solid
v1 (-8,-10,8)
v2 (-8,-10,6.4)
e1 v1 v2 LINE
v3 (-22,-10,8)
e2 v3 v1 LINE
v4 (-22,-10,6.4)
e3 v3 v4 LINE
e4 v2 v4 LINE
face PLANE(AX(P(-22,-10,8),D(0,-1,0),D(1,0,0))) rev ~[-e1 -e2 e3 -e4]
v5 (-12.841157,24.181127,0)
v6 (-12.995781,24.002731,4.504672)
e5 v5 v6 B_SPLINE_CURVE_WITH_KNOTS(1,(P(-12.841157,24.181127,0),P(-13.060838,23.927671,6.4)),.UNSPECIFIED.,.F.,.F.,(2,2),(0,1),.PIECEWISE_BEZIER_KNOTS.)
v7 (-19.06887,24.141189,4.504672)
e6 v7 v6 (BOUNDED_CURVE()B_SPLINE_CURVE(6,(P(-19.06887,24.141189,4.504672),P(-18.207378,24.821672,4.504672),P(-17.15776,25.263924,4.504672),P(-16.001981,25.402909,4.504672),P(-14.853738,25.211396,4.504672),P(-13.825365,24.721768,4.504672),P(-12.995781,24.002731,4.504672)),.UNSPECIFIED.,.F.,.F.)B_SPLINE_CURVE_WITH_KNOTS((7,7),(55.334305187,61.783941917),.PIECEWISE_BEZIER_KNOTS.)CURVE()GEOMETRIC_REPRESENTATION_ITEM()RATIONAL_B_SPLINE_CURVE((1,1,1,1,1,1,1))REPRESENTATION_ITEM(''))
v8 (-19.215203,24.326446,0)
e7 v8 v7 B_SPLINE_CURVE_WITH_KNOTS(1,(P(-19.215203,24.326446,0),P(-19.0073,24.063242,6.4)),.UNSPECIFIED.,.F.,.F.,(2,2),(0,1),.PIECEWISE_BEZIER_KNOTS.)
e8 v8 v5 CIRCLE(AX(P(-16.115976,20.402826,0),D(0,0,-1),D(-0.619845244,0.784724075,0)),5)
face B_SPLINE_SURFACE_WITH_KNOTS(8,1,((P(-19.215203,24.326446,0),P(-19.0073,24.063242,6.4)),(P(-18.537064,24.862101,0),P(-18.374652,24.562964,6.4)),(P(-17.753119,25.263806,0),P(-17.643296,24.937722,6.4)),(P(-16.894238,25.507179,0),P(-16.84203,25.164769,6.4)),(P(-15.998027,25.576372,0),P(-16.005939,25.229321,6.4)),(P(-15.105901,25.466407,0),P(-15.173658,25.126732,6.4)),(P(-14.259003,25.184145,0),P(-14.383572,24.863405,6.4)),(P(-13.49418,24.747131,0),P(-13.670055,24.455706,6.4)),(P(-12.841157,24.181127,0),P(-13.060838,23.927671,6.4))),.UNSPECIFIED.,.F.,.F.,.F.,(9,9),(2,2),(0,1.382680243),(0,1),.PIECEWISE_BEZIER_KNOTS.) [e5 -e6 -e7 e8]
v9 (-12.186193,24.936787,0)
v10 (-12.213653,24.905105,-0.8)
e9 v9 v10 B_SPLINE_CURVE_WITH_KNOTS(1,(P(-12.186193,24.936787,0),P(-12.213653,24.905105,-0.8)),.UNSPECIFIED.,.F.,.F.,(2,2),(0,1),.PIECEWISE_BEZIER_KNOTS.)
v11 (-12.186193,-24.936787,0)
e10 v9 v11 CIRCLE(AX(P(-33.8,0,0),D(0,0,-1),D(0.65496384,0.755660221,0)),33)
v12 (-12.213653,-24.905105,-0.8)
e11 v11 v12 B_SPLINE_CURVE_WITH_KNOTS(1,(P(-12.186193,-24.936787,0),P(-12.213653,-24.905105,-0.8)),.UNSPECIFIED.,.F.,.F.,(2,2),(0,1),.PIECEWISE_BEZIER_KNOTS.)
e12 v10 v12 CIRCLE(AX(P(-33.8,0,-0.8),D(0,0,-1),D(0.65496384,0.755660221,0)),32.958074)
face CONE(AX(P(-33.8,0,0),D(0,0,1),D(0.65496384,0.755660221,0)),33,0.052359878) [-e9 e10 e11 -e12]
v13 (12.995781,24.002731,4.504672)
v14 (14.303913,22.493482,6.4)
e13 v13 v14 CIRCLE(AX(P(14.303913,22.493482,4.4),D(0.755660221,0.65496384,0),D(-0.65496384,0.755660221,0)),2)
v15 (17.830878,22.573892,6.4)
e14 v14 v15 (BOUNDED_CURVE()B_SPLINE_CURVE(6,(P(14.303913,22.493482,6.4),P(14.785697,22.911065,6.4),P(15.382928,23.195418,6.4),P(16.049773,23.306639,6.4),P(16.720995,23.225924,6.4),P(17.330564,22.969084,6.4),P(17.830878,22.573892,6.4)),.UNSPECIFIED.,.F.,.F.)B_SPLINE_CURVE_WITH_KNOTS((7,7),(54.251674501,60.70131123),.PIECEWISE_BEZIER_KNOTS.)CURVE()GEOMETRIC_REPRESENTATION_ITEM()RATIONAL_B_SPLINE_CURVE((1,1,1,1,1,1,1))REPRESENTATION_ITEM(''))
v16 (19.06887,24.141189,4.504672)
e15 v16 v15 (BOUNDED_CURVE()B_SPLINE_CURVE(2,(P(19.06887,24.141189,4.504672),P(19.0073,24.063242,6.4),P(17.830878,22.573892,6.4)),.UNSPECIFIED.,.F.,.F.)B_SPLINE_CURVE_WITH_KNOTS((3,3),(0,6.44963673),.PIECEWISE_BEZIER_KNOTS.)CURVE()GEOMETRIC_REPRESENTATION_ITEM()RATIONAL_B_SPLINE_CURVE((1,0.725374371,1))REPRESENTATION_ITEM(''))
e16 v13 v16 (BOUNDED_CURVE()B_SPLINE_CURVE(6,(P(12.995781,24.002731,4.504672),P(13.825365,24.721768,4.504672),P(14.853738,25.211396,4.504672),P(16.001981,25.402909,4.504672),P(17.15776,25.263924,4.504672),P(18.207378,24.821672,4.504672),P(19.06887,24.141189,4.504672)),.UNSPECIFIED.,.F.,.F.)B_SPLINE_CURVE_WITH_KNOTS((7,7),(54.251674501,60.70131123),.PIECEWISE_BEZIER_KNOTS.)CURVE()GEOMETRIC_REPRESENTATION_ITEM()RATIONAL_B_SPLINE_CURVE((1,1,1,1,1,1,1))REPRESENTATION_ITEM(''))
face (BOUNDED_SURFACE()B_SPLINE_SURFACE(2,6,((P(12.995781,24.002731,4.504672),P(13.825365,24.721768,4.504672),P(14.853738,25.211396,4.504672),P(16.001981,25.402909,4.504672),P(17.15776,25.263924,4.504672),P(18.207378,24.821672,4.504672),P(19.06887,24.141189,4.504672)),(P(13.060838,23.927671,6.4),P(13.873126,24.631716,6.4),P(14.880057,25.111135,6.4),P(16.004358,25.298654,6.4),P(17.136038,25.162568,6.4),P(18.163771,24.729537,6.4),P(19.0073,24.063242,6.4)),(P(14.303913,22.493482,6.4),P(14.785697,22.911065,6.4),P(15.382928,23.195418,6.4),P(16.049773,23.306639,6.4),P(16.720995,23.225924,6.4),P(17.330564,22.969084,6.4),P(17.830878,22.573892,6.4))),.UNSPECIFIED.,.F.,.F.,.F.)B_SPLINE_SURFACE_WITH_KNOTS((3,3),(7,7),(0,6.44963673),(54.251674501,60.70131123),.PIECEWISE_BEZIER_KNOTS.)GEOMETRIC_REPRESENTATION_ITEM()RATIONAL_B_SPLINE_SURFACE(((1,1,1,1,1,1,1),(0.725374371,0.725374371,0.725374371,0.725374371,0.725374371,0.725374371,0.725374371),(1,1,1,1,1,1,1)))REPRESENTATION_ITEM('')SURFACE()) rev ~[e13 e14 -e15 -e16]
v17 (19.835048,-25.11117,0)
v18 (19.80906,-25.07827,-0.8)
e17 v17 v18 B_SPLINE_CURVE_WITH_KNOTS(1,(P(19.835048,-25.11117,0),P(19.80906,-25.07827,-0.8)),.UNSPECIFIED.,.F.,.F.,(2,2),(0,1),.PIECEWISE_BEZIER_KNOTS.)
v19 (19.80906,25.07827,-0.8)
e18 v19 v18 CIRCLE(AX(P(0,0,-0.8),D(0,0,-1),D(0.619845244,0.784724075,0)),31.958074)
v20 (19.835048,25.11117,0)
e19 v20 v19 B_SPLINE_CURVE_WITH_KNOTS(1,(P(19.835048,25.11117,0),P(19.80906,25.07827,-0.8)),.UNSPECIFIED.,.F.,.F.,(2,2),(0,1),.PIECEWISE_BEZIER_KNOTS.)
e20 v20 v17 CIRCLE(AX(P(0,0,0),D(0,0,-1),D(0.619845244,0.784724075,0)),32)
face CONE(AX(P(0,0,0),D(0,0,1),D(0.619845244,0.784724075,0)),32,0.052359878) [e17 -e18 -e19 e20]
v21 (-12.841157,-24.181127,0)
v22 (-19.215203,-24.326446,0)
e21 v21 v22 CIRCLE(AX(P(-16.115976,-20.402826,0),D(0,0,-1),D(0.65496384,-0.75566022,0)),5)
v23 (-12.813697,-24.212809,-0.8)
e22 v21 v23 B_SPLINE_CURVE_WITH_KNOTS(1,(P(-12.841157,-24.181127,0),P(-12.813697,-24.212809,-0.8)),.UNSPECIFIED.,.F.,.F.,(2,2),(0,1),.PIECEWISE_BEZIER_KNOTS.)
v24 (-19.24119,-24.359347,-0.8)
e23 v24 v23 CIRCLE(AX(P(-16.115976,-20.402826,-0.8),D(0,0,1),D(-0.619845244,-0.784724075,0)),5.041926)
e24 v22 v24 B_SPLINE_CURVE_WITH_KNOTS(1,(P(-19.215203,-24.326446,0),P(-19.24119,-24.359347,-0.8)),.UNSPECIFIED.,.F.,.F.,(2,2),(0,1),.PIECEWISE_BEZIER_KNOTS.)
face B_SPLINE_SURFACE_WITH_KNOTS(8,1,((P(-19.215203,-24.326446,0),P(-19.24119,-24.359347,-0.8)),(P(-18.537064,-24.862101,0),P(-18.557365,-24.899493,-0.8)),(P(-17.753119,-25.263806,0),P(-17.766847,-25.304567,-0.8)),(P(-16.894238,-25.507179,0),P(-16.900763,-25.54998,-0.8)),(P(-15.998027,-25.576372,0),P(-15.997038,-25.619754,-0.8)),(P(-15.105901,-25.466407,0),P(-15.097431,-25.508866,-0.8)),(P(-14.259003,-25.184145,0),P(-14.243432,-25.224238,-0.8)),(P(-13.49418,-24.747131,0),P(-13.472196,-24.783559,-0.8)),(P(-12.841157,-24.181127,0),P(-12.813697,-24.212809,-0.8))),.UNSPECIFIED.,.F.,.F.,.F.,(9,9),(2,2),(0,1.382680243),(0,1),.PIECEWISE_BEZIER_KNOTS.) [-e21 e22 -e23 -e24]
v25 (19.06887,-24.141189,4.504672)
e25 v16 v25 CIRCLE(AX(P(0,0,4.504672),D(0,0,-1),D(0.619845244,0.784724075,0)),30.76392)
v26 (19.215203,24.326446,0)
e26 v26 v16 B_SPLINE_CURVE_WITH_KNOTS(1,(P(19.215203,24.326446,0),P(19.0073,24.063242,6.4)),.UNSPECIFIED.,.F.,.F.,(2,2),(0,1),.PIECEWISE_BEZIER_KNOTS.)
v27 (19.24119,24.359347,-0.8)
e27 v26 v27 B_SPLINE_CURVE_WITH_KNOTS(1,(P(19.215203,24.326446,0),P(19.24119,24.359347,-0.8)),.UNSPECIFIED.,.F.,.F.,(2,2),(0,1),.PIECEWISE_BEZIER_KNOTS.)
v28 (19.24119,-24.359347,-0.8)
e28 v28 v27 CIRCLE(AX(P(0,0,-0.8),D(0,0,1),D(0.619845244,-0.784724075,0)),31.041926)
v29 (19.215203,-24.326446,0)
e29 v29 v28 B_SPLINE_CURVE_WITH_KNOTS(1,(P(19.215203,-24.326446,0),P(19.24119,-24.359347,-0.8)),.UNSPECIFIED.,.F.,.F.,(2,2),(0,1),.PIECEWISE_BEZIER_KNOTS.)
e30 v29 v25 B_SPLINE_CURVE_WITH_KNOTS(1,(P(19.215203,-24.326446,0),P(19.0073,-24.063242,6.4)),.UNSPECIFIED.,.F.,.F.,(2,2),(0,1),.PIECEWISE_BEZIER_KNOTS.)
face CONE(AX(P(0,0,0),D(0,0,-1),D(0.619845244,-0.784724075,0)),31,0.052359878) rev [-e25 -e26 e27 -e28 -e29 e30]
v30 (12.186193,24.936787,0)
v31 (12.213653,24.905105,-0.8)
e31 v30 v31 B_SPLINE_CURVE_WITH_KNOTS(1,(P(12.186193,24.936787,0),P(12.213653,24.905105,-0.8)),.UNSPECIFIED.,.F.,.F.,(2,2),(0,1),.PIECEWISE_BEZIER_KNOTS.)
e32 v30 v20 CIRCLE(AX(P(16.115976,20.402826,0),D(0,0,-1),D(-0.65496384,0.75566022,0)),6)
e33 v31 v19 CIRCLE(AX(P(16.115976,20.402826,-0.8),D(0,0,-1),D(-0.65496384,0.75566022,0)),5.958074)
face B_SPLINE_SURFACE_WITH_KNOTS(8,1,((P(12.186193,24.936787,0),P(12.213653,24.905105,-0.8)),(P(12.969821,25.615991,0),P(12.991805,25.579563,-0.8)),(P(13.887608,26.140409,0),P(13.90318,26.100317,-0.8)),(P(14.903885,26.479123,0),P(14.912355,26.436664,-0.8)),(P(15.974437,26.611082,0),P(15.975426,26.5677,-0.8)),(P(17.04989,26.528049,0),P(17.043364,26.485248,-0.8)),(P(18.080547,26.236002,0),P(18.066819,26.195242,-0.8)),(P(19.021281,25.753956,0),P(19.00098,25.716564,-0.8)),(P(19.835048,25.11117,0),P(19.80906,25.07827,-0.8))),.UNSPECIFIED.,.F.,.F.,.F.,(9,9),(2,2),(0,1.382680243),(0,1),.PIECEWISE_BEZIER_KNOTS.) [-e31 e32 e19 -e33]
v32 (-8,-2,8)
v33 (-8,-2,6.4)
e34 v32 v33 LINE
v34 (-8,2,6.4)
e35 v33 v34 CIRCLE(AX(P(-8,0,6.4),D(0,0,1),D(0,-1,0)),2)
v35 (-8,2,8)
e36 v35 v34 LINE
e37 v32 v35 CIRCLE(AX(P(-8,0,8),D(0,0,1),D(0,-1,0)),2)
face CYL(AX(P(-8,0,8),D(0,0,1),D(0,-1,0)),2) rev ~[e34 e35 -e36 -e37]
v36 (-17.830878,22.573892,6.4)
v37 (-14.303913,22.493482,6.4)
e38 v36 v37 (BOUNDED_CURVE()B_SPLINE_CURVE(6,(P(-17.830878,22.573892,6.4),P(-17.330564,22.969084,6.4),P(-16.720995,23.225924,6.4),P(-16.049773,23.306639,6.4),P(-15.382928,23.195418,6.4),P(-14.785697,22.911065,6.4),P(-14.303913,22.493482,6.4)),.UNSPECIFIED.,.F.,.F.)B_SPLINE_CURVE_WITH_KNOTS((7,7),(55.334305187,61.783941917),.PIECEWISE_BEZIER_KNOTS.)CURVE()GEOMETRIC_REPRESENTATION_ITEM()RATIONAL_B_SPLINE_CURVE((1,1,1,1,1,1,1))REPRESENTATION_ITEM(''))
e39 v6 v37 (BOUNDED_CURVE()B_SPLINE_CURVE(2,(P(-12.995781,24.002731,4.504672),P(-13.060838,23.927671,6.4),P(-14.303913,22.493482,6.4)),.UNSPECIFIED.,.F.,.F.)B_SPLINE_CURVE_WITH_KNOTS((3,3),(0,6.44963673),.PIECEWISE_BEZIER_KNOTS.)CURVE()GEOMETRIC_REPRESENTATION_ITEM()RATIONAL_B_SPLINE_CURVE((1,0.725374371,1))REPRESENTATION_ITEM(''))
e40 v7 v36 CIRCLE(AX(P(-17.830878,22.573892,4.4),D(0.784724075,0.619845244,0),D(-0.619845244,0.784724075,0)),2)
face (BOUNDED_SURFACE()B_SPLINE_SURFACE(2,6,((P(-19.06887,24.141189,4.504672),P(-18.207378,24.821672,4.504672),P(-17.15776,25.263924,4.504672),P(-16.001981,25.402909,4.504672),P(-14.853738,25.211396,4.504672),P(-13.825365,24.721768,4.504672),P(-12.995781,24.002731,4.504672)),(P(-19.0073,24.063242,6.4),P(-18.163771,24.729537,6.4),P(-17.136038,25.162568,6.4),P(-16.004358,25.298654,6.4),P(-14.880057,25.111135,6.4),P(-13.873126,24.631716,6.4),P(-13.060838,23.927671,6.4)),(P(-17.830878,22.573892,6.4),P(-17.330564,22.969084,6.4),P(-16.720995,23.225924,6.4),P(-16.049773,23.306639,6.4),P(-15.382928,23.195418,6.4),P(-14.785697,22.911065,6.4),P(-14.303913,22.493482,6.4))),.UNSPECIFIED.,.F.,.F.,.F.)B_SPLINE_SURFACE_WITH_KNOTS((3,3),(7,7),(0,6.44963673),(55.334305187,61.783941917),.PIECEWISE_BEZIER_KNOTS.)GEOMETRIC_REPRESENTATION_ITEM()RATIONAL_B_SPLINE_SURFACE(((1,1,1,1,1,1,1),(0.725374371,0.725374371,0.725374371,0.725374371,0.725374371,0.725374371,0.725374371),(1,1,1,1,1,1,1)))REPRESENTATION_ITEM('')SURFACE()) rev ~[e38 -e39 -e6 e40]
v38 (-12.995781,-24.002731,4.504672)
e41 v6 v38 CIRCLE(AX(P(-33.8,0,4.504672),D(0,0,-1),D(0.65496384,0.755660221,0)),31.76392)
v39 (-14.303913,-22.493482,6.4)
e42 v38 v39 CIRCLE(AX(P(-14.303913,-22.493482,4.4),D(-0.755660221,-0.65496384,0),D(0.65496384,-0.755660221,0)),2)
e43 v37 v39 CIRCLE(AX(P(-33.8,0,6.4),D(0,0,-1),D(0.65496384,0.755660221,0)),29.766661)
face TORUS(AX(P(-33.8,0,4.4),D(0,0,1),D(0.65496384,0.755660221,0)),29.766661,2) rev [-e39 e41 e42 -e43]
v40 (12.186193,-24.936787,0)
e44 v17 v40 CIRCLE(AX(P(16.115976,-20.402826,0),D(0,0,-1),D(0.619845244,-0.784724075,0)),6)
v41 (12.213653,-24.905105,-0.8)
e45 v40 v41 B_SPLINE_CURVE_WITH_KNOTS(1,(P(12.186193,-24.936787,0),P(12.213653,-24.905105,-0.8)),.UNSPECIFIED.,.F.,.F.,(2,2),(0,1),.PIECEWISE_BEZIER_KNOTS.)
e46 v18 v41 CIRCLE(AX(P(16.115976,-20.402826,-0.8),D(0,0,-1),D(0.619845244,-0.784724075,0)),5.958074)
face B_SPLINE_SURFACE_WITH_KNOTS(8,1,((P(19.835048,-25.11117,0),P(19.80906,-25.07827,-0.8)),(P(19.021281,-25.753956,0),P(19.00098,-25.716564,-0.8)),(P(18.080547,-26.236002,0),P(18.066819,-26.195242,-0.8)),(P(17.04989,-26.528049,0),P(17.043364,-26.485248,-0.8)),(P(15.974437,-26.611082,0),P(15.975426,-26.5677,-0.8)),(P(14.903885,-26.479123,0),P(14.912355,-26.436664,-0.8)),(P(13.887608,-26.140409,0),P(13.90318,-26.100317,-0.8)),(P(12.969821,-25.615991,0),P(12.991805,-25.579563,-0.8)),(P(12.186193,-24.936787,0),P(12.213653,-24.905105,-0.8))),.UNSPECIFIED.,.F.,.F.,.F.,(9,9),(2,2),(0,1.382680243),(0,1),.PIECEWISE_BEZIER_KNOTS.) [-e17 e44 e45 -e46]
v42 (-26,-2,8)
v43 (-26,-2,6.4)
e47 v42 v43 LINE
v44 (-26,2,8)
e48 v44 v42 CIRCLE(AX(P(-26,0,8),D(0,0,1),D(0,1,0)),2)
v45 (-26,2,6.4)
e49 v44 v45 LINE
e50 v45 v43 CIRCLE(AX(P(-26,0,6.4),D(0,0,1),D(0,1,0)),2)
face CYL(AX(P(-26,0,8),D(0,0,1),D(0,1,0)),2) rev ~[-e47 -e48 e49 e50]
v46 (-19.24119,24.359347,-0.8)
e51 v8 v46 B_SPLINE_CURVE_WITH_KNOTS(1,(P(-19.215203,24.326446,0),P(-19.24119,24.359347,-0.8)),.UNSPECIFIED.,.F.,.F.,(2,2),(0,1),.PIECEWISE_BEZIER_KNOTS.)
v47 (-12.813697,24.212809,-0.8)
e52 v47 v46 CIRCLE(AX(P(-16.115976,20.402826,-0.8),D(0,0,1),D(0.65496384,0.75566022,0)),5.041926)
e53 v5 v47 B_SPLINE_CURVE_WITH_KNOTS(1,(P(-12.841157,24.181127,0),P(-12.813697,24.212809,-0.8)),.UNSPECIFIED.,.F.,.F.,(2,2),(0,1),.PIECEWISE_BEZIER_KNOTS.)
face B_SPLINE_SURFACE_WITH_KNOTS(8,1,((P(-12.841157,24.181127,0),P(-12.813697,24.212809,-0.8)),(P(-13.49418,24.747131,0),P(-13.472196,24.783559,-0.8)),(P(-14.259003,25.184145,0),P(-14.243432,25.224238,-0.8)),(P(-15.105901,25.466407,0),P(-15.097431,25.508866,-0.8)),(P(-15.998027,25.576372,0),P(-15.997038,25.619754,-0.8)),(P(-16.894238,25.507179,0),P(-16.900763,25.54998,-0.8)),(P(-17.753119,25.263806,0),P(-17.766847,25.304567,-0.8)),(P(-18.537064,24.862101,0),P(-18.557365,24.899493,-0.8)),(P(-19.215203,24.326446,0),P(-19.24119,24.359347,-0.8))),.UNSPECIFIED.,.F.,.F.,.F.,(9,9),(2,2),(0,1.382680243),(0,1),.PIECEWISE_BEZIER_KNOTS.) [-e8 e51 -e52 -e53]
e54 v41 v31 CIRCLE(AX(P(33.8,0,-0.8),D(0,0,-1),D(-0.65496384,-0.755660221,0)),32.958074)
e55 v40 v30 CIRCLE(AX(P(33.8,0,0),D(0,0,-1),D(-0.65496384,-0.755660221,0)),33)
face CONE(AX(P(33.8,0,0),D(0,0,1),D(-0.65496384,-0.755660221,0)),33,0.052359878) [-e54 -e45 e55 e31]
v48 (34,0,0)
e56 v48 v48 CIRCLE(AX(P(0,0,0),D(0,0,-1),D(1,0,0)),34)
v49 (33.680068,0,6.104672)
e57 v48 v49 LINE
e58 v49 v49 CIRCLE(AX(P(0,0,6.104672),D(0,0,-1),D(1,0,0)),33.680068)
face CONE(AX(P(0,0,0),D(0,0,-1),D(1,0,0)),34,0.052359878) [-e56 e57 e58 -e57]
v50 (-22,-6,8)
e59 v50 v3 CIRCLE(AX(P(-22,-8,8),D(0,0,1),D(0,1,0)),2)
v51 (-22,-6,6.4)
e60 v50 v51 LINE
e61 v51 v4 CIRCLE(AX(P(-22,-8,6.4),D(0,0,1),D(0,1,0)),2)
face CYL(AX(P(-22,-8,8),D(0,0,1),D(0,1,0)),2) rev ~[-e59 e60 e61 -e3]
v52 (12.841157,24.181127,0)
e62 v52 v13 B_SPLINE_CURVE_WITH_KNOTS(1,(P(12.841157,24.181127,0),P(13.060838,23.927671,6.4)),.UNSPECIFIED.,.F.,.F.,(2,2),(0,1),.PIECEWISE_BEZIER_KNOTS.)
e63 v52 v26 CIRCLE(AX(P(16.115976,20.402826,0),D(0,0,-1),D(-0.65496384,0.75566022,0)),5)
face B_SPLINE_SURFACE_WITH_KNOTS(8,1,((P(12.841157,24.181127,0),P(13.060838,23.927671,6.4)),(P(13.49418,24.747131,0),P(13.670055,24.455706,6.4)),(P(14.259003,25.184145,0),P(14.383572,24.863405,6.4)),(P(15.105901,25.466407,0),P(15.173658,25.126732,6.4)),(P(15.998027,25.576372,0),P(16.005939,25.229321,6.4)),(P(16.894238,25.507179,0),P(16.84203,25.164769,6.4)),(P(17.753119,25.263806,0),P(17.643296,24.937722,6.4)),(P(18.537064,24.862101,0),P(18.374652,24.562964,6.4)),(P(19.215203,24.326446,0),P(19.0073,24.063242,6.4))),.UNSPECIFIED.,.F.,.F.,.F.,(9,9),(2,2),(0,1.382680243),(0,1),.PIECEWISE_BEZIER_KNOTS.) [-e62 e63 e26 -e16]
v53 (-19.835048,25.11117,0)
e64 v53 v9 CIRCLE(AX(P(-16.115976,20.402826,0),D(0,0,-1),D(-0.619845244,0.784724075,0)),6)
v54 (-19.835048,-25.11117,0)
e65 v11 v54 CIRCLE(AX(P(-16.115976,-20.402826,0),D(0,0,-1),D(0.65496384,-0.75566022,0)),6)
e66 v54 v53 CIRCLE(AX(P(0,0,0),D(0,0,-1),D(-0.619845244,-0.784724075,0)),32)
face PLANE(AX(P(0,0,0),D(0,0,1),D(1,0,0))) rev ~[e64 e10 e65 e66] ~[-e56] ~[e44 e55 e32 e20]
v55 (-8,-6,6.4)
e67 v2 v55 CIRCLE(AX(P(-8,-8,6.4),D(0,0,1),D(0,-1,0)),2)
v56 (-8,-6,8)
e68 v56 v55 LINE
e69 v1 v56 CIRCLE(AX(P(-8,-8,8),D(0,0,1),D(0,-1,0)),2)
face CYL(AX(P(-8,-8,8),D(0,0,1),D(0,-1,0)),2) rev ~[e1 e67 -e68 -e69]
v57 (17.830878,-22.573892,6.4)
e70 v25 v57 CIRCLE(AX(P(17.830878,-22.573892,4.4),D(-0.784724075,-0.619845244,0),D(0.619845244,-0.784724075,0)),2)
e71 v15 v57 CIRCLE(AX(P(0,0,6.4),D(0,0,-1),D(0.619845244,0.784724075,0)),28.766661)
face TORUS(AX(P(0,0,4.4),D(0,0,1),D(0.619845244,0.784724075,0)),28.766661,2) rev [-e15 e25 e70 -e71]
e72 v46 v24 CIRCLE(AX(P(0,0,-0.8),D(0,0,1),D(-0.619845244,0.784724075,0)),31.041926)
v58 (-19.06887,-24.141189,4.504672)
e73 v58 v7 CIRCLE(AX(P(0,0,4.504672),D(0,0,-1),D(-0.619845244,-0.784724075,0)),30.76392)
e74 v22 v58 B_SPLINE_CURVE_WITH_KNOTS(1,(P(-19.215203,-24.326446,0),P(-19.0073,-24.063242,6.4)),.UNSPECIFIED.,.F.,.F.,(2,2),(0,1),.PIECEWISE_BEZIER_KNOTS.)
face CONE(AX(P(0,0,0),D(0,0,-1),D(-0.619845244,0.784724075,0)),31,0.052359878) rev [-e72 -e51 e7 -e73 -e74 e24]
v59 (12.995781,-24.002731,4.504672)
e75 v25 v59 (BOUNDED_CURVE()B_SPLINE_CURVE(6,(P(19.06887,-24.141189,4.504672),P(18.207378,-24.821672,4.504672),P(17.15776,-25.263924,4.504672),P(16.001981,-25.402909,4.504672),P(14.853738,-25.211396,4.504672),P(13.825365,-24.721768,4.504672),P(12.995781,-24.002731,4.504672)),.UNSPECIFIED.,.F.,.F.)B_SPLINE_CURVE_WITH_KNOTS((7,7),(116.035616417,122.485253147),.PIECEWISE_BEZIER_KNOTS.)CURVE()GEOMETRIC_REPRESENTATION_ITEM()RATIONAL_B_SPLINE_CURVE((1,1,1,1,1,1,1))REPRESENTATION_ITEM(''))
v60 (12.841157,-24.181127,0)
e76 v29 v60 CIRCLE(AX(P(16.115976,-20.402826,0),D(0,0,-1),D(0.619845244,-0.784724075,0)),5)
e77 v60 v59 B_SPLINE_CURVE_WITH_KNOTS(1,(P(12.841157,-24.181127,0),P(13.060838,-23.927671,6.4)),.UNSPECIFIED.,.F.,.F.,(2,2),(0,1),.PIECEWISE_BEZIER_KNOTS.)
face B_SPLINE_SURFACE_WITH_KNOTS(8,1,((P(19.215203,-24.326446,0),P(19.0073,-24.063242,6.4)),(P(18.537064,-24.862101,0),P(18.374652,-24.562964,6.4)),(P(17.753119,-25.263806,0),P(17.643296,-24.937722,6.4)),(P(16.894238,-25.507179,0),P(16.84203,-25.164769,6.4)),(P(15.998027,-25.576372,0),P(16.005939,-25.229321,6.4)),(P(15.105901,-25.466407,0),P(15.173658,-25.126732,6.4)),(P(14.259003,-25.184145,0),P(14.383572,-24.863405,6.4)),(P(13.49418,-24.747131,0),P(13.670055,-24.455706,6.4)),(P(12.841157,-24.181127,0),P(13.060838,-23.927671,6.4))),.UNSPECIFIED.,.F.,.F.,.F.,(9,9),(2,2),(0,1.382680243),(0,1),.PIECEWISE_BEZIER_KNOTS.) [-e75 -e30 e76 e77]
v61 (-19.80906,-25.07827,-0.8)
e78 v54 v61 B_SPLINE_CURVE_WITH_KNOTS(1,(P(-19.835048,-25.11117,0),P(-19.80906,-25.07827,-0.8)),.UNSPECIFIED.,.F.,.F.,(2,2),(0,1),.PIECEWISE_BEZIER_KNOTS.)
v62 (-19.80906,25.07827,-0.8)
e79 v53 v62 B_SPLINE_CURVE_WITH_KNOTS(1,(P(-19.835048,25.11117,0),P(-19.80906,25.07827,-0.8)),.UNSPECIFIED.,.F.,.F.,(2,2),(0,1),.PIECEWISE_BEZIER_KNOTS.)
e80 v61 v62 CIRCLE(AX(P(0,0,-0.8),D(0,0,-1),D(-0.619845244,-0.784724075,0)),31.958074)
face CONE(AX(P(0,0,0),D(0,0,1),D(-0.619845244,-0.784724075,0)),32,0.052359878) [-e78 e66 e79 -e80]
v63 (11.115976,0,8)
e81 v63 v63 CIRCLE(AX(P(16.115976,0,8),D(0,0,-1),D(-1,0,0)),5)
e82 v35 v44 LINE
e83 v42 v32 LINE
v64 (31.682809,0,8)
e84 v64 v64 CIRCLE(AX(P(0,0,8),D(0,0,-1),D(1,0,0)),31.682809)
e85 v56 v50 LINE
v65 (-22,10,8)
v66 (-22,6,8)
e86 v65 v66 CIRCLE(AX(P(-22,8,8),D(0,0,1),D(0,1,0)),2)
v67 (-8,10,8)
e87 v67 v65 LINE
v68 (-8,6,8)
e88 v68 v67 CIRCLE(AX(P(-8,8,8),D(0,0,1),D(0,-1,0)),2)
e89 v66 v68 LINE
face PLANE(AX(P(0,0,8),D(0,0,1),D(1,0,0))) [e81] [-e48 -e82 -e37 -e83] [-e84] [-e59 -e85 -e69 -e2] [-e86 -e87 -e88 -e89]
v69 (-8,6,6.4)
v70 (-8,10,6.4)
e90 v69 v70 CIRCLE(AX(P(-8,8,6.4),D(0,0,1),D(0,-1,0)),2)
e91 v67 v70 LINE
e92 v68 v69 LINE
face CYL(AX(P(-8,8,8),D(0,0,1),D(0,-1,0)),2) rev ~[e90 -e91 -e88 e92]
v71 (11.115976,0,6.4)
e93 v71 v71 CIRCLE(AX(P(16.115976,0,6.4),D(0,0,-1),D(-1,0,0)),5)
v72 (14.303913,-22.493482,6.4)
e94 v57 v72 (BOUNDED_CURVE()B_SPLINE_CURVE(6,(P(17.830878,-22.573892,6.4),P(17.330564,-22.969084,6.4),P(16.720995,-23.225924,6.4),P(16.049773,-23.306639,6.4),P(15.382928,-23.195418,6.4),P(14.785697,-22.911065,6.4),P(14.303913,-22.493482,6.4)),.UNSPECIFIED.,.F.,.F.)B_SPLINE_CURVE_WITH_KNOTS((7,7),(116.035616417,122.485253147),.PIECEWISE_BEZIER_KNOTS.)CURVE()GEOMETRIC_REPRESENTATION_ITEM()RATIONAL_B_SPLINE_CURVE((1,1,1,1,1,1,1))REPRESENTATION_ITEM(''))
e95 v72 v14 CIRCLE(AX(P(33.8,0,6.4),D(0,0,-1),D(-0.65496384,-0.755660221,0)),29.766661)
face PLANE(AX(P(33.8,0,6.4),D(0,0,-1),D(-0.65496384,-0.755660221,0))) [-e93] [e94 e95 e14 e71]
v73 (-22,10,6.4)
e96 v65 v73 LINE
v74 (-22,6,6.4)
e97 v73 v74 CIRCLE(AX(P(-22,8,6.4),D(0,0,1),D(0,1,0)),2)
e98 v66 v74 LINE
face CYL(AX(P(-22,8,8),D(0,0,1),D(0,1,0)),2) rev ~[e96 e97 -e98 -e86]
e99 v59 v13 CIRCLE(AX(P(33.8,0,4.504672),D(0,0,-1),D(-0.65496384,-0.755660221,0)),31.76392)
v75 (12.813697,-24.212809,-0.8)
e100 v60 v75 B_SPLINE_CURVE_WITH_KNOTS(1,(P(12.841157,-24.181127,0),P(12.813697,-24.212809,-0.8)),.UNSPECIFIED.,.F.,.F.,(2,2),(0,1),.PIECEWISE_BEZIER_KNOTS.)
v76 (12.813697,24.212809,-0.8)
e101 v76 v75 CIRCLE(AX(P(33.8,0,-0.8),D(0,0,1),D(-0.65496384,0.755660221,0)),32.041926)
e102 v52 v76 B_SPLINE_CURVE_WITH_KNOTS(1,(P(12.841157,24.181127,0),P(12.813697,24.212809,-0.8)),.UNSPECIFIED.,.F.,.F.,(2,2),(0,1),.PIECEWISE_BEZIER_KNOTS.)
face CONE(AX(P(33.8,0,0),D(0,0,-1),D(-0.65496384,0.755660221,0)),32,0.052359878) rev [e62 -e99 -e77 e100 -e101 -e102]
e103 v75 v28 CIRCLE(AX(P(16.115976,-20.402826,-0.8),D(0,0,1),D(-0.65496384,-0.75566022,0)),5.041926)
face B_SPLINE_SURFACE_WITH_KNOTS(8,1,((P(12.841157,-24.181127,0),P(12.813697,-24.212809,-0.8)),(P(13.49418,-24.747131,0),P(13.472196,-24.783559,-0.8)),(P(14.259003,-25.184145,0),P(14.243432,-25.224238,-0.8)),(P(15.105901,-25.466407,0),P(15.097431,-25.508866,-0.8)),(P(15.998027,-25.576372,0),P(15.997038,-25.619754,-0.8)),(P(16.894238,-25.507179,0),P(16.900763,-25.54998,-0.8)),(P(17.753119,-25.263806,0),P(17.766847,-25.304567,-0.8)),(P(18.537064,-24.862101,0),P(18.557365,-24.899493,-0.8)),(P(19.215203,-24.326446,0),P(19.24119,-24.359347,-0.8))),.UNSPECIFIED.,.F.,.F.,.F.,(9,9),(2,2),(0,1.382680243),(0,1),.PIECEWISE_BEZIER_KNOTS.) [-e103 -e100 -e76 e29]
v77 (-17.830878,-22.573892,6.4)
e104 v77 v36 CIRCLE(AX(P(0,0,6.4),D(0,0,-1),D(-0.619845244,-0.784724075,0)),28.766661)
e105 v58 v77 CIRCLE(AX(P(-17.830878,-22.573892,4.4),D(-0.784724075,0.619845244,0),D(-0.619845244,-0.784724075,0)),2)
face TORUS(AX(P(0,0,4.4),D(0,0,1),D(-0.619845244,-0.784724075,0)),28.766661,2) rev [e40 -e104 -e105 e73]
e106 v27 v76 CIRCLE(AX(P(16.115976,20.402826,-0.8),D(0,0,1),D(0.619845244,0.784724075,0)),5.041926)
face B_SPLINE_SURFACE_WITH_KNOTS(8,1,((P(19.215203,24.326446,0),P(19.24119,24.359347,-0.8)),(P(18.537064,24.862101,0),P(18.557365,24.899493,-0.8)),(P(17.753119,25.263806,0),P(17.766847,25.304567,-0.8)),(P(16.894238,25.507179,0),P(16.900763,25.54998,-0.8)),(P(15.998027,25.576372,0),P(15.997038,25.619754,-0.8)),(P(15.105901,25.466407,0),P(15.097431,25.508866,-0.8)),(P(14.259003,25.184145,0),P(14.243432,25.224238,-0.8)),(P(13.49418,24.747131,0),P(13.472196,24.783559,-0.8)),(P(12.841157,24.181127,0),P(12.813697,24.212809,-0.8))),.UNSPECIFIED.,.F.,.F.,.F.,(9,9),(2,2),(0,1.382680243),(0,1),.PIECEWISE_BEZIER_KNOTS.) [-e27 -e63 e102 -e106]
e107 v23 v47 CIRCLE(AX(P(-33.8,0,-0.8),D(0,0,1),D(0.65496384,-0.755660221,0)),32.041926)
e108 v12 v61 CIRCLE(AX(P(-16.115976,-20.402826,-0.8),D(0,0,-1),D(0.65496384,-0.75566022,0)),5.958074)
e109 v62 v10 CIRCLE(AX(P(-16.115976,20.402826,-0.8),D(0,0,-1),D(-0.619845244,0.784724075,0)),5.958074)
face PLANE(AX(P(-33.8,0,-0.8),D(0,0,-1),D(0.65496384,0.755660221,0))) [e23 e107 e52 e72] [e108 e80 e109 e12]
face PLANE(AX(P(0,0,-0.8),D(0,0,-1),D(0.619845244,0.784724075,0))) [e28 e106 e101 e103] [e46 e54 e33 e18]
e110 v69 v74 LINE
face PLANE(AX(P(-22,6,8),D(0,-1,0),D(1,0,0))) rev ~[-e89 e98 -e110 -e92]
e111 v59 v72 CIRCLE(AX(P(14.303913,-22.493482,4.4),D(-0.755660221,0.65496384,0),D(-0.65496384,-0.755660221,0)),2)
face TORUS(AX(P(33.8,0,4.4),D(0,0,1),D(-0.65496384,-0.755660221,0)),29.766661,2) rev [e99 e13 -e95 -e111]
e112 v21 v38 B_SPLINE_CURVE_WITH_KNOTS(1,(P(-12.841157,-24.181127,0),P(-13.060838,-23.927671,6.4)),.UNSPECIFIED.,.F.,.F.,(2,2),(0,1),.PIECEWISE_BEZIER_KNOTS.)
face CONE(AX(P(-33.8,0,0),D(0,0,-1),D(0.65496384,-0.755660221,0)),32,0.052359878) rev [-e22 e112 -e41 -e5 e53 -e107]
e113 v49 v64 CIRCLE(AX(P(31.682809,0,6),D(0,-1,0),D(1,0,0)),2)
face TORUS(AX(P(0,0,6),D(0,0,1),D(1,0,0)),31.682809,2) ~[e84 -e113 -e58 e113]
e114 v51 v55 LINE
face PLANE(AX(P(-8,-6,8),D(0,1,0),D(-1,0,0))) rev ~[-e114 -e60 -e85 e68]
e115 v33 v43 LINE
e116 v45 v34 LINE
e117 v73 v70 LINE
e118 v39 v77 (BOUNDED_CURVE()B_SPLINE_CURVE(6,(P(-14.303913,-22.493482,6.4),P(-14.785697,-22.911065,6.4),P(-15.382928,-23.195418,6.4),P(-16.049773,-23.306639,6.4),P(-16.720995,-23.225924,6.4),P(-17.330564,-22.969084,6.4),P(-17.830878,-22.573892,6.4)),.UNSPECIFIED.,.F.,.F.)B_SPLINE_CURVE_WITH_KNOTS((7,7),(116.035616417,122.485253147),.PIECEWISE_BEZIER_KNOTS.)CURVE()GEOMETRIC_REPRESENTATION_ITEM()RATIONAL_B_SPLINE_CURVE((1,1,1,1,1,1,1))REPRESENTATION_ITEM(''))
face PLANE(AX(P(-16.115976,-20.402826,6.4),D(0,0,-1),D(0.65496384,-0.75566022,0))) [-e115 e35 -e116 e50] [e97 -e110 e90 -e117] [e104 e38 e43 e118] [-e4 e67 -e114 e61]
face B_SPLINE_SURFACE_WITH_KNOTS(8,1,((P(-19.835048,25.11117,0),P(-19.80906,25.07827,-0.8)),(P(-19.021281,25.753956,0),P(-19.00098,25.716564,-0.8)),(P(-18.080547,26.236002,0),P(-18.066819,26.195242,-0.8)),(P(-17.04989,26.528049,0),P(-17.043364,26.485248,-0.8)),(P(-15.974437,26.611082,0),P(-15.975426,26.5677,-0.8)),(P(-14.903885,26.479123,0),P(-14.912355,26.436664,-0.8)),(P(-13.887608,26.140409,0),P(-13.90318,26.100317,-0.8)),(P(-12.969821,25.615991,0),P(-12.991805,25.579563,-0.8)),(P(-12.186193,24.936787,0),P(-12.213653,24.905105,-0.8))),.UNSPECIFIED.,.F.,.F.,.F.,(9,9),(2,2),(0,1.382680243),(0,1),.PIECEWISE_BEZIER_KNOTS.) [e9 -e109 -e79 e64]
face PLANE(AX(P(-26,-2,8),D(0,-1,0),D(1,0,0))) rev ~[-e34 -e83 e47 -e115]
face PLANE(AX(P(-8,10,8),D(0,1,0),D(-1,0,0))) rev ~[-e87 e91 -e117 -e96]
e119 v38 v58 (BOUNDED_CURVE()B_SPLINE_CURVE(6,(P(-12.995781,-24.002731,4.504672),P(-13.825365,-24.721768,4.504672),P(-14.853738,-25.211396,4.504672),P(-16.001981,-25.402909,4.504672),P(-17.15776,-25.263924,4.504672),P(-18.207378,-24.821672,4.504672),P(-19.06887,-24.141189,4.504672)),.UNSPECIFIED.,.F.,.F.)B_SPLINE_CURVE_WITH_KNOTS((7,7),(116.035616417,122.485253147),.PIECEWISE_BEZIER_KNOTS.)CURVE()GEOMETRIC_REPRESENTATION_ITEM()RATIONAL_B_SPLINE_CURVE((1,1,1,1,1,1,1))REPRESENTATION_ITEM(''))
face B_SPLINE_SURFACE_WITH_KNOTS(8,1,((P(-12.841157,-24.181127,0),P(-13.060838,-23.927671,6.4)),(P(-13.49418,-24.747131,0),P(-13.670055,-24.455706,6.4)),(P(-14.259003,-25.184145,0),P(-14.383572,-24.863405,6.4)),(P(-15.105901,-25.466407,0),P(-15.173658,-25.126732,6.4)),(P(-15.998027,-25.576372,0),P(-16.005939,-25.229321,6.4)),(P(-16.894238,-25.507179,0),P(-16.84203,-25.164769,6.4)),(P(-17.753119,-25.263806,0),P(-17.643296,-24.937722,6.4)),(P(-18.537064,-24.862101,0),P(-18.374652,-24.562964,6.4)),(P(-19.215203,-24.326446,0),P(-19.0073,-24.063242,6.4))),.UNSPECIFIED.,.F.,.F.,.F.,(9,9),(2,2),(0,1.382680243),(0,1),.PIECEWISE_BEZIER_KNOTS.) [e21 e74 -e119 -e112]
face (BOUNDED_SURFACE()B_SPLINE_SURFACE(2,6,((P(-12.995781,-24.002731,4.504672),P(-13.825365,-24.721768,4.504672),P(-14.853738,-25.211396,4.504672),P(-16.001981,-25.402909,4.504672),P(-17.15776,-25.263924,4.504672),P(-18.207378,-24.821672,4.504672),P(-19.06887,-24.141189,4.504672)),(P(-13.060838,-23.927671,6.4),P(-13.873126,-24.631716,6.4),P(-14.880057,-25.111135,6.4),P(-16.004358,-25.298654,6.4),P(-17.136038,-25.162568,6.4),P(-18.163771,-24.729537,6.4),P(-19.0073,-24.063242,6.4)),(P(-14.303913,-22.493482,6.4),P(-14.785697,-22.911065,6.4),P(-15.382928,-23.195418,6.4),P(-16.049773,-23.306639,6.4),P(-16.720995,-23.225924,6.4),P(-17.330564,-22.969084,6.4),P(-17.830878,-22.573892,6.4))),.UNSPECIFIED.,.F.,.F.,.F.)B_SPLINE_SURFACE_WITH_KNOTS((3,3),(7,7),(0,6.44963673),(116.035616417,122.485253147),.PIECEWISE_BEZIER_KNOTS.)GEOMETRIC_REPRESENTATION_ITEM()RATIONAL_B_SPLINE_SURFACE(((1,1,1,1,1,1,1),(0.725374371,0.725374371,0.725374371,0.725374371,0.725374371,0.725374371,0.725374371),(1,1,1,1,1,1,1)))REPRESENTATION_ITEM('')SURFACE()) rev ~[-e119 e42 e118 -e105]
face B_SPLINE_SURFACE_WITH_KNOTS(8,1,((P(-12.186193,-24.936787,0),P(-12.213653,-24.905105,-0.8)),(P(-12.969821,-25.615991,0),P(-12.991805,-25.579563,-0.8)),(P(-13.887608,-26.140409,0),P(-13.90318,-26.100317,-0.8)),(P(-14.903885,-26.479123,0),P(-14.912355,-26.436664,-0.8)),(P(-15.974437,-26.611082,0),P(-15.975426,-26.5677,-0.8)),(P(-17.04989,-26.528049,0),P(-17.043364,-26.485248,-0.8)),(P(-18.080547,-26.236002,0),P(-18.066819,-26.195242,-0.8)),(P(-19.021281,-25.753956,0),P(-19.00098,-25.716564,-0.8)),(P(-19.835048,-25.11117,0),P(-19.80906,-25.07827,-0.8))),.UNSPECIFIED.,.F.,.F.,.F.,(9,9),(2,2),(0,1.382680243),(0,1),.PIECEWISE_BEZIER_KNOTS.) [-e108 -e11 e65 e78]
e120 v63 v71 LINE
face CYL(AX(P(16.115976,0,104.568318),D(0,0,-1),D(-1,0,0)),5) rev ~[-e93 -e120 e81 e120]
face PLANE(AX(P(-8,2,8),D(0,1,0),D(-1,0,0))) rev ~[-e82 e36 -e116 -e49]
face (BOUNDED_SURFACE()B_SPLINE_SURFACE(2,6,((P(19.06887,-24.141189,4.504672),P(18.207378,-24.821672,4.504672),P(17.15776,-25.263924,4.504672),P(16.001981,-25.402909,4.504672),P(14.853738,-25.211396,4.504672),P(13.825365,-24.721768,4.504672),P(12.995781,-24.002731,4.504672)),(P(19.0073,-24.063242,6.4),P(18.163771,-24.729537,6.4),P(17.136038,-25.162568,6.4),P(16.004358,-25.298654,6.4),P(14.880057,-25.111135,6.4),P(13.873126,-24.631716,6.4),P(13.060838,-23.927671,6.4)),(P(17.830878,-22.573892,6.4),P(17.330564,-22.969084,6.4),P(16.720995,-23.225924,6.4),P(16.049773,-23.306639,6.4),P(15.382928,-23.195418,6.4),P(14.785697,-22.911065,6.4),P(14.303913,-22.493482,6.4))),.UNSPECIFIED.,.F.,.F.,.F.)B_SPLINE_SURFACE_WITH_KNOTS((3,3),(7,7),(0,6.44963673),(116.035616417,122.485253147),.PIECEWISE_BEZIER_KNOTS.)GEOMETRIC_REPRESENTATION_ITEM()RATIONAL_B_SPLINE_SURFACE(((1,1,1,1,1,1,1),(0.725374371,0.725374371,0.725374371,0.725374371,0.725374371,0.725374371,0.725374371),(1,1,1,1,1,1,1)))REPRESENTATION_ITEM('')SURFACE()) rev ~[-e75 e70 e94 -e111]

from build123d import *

# Parameters (mm, degrees)
F0_R      = 34
F1_DEPTH  = 8
F1_TAPER  = 3
F3_DEPTH  = 6.4
F3_TAPER  = 3
F5_DEPTH  = 0.8
F5_TAPER  = 3
F6_R      = 2
F8_D      = 10
F10_DEPTH = 8.8010001
F12_DEPTH = 8.8010001


with BuildPart() as f1:
    # F0 (on Top) → F1 (new body)
    with BuildSketch(Plane.XY):
        Circle(F0_R)
    extrude(amount=F1_DEPTH, taper=F1_TAPER)

    # F2 (on face) → F3 (cut)
    with BuildSketch(Plane(origin=(0, 0, 0), x_dir=(1, 0, 0), z_dir=(0, 0, -1))):
        with BuildLine():
            ThreePointArc((-12.8411571335, 24.1811270559), (-16.0020129755, 25.4015270201), (-19.2152025489, 24.3264463291))
            ThreePointArc((-19.2152025489, 24.3264463291), (-31, 0), (-19.2152025489, -24.3264463291))
            ThreePointArc((-19.2152025489, -24.3264463291), (-16.0020129755, -25.4015270201), (-12.8411571335, -24.1811270559))
            ThreePointArc((-12.8411571335, -24.1811270559), (-1.8, 0), (-12.8411571335, 24.1811270559))
        make_face()
        with BuildLine():
            ThreePointArc((12.8411571335, 24.1811270559), (1.8, 0), (12.8411571335, -24.1811270559))
            ThreePointArc((12.8411571335, -24.1811270559), (16.0020129755, -25.4015270201), (19.2152025489, -24.3264463291))
            ThreePointArc((19.2152025489, -24.3264463291), (31, 0), (19.2152025489, 24.3264463291))
            ThreePointArc((19.2152025489, 24.3264463291), (16.0020129755, 25.4015270201), (12.8411571335, 24.1811270559))
        make_face()
    extrude(amount=-F3_DEPTH, taper=F3_TAPER, mode=Mode.SUBTRACT)

    # F4 (on face) → F5 (join)
    with BuildSketch(Plane(origin=(0, 0, 0), x_dir=(1, 0, 0), z_dir=(0, 0, -1))):
        with BuildLine():
            ThreePointArc((-12.1861932939, -24.9367872764), (-0.8, 0), (-12.1861932939, 24.9367872764))
            ThreePointArc((-12.1861932939, 24.9367872764), (-15.9792203044, 26.4012672334), (-19.8350477924, 25.1111704043))
            ThreePointArc((-19.8350477924, 25.1111704043), (-32, 0), (-19.8350477924, -25.1111704043))
            ThreePointArc((-19.8350477924, -25.1111704043), (-15.9792203044, -26.4012672334), (-12.1861932939, -24.9367872764))
        make_face()
        with BuildLine():
            ThreePointArc((-19.2152025489, -24.3264463291), (-31, 0), (-19.2152025489, 24.3264463291))
            ThreePointArc((-19.2152025489, 24.3264463291), (-16.0020129755, 25.4015270201), (-12.8411571335, 24.1811270559))
            ThreePointArc((-12.8411571335, 24.1811270559), (-1.8, 0), (-12.8411571335, -24.1811270559))
            ThreePointArc((-12.8411571335, -24.1811270559), (-16.0020129755, -25.4015270201), (-19.2152025489, -24.3264463291))
        make_face(mode=Mode.SUBTRACT)
        with BuildLine():
            ThreePointArc((19.8350477924, -25.1111704043), (32, 0), (19.8350477924, 25.1111704043))
            ThreePointArc((19.8350477924, 25.1111704043), (15.9792203044, 26.4012672334), (12.1861932939, 24.9367872764))
            ThreePointArc((12.1861932939, 24.9367872764), (0.8, 0), (12.1861932939, -24.9367872764))
            ThreePointArc((12.1861932939, -24.9367872764), (15.9792203044, -26.4012672334), (19.8350477924, -25.1111704043))
        make_face()
        with BuildLine():
            ThreePointArc((12.8411571335, 24.1811270559), (16.0020129755, 25.4015270201), (19.2152025489, 24.3264463291))
            ThreePointArc((19.2152025489, 24.3264463291), (31, 0), (19.2152025489, -24.3264463291))
            ThreePointArc((19.2152025489, -24.3264463291), (16.0020129755, -25.4015270201), (12.8411571335, -24.1811270559))
            ThreePointArc((12.8411571335, -24.1811270559), (1.8, 0), (12.8411571335, 24.1811270559))
        make_face(mode=Mode.SUBTRACT)
    extrude(amount=F5_DEPTH, taper=F5_TAPER)

    # F6
    f6_edges = [f1.edges().sort_by_distance(p)[0] for p in [
        (-33.580738, 0, 8),
        (-30.66459, 0, 6.4),
        (2.13541, 0, 6.4),
    ]]
    fillet(f6_edges, radius=F6_R)

    # F8 (through all)
    with Locations(Plane.XY.offset(8)):
        with Locations((16.1159763314, 0)):
            Hole(F8_D / 2)

    # F9 (on face) → F10 (cut, through all)
    with BuildSketch(Plane.XY.offset(8)):
        with BuildLine():
            Line((-26, -2), (-8, -2))
            ThreePointArc((-8, -2), (-6, 0), (-8, 2))
            Line((-8, 2), (-26, 2))
            ThreePointArc((-26, 2), (-28, 0), (-26, -2))
        make_face()
    extrude(amount=-F10_DEPTH, mode=Mode.SUBTRACT)

    # F11 (on face) → F12 (cut, through all)
    with BuildSketch(Plane.XY.offset(8)):
        with BuildLine():
            Line((-22, 6), (-8, 6))
            ThreePointArc((-8, 6), (-6, 8), (-8, 10))
            Line((-8, 10), (-22, 10))
            ThreePointArc((-22, 10), (-24, 8), (-22, 6))
        make_face()
        with BuildLine():
            ThreePointArc((-8, -10), (-6, -8), (-8, -6))
            Line((-8, -6), (-22, -6))
            ThreePointArc((-22, -6), (-24, -8), (-22, -10))
            Line((-22, -10), (-8, -10))
        make_face()
    extrude(amount=-F12_DEPTH, mode=Mode.SUBTRACT)


solid = f1.part
